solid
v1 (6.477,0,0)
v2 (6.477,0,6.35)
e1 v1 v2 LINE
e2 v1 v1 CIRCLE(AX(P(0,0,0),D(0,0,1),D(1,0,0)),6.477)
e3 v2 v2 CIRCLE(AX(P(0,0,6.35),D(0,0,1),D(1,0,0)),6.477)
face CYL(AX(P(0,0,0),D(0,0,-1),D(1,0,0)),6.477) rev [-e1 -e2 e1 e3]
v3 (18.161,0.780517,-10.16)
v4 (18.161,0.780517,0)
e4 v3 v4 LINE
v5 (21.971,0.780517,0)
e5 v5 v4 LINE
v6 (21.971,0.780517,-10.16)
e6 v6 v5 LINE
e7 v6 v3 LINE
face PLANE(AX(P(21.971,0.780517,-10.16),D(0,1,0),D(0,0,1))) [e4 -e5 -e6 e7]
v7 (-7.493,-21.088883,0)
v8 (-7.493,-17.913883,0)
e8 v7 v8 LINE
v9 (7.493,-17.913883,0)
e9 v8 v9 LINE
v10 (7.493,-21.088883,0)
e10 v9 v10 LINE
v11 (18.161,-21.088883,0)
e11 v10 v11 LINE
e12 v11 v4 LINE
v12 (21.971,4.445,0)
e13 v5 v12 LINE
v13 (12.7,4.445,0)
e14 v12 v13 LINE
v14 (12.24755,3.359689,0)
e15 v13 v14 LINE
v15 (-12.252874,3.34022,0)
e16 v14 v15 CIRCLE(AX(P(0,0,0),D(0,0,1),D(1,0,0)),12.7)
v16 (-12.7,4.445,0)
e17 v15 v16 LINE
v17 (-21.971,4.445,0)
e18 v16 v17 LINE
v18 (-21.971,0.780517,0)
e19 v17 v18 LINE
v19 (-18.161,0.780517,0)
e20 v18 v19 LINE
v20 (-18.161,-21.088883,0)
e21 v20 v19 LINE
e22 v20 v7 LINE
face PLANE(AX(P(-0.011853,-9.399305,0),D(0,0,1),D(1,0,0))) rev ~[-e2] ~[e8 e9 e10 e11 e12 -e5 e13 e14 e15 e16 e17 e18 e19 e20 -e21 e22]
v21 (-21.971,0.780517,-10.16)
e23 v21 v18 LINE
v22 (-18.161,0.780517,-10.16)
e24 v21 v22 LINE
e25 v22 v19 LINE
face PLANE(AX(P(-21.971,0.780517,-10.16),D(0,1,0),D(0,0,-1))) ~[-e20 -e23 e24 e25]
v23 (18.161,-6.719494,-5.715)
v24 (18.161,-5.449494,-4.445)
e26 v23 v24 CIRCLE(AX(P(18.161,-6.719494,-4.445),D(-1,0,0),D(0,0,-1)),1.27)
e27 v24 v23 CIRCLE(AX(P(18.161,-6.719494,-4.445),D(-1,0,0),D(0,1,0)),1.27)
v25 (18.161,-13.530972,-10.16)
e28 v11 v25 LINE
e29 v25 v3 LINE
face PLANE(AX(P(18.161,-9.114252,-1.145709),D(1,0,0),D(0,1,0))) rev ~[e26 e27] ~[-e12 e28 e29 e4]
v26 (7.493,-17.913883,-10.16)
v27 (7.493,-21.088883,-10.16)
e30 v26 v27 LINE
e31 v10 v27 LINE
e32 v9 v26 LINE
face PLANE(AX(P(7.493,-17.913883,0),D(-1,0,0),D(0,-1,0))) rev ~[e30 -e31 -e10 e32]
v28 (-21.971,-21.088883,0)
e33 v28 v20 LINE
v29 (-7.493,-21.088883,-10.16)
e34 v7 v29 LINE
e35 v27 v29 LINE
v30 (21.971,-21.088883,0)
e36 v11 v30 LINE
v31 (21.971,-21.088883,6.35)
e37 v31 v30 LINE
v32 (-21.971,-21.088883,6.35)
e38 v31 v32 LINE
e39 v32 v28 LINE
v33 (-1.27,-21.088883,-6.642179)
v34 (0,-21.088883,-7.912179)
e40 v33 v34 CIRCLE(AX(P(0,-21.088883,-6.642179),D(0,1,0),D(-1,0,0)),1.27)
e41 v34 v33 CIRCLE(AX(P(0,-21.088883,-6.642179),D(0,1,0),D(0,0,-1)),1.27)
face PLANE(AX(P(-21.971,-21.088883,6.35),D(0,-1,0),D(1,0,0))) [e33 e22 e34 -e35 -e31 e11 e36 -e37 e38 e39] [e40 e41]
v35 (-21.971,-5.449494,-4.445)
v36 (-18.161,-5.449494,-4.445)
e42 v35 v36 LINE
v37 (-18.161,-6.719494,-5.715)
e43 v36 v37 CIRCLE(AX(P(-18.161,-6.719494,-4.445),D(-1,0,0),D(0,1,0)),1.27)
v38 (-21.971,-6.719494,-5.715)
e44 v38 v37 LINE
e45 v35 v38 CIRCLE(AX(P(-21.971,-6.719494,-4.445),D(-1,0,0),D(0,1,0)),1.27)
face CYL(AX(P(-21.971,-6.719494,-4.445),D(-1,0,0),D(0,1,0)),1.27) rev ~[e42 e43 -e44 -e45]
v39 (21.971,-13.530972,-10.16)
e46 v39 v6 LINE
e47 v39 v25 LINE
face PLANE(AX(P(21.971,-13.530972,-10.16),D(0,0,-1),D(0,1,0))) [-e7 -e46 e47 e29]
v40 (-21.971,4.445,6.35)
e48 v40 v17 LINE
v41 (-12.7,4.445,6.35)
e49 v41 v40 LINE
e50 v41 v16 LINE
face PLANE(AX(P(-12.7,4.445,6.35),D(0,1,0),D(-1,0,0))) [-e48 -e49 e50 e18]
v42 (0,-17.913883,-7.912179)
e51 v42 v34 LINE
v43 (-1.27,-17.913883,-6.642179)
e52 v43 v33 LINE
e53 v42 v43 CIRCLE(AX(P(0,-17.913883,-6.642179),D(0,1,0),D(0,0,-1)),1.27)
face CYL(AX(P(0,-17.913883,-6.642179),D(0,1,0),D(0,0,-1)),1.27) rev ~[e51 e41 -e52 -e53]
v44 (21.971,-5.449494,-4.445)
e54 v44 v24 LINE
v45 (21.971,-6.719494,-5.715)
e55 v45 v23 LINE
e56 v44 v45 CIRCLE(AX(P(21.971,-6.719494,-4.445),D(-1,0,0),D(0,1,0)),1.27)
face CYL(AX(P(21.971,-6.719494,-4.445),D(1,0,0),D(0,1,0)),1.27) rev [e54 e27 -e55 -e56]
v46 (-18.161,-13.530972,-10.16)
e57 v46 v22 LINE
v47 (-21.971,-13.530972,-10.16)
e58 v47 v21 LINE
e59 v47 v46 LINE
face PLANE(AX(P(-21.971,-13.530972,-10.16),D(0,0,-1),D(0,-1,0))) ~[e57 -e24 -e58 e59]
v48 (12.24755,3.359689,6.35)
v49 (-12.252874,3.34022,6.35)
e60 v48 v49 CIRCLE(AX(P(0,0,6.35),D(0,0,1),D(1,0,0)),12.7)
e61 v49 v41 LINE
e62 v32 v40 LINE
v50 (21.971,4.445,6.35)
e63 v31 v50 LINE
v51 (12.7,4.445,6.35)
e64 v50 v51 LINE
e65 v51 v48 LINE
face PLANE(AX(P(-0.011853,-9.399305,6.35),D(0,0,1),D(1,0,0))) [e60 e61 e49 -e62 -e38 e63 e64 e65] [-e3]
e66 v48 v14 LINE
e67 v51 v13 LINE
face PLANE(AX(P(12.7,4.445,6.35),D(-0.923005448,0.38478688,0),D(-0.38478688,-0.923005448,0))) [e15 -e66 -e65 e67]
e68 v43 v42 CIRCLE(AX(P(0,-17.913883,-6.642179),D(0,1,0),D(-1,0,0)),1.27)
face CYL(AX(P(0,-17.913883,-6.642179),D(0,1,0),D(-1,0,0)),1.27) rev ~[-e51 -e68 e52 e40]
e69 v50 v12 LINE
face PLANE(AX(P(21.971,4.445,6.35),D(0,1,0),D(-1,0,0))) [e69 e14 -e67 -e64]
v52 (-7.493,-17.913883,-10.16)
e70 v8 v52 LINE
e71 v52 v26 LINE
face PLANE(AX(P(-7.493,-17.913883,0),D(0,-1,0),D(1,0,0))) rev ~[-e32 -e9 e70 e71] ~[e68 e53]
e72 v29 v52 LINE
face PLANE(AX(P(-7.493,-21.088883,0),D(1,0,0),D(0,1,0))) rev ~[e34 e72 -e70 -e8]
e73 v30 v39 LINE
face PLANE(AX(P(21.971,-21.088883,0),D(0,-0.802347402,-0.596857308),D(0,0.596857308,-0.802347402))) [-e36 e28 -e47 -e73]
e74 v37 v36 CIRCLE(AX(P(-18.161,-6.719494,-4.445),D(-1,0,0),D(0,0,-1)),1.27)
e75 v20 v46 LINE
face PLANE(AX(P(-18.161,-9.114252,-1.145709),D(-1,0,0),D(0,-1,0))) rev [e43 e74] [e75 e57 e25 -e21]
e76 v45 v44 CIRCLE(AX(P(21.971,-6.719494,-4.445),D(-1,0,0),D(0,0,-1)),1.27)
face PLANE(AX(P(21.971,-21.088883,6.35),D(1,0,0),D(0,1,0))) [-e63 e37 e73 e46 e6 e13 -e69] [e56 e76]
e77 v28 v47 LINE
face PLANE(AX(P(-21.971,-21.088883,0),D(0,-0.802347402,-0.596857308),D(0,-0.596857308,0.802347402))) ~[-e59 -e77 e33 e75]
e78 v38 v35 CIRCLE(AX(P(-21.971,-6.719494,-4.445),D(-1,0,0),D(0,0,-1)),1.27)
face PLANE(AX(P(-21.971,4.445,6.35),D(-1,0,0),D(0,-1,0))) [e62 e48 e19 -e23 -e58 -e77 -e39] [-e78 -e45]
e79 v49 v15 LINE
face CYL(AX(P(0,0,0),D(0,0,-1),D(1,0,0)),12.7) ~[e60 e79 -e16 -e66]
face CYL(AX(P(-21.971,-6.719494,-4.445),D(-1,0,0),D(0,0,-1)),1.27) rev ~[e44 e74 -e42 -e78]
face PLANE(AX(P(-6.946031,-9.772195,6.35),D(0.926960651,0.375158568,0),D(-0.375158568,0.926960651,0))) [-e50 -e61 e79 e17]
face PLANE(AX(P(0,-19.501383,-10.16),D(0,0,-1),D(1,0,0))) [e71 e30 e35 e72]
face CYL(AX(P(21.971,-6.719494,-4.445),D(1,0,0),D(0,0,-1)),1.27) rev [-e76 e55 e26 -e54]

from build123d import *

# Parameters (mm, degrees)
F0_R     = 12.7
F0_R_2   = 6.477
F1_DEPTH = 6.35
F3_DEPTH = 6.35
F5_DEPTH = 3.81
F7_DEPTH = 10.16
F9_DEPTH = 25.4


# Not quite as in the source:
# - a pattern or mirror of a feature is missing from the dataset's text; its kind, count and spacing are read off the source's solid


with BuildPart() as f1:
    # F0 (on Top) → F1 (new body)
    with BuildSketch(Plane.XY):
        Circle(F0_R)
        Circle(F0_R_2, mode=Mode.SUBTRACT)
    extrude(amount=F1_DEPTH)

    # F2 (on face) → F3 (join)
    with BuildSketch(Plane.XY.offset(6.35)):
        Polygon((-21.971, -21.0888834), (0, -21.0888834), (21.971, -21.0888834), (21.971, -17.9138834), (21.971, 4.445), (12.7, 4.445), (6.7730685696, -9.7721947122), (-6.9460314699, -9.7721947122), (-12.7, 4.445), (-21.971, 4.445), (-21.971, -17.907), align=None)
    extrude(amount=-F3_DEPTH)

    # F4 (on face) → F5 (join)
    with BuildSketch(Plane.YZ.offset(21.971)):
        Polygon((0.7805166, 6.35), (-21.0888834, 6.35), (-21.0888834, 0), (-13.5309724137, -10.16), (-6.7194938, -10.16), (0.7805166, -10.16), align=None)
        with BuildLine():
            ThreePointArc((-5.4494938, -4.445), (-5.8214681879, -5.3430256121), (-6.7194938, -5.715))
            ThreePointArc((-6.7194938, -5.715), (-7.6175194121, -3.5469743879), (-5.4494938, -4.445))
        make_face(mode=Mode.SUBTRACT)
    f5 = extrude(amount=-F5_DEPTH)

    # F5_copies: F5 across plane
    add(f5.mirror(Plane(origin=(0, 0, 0), x_dir=(0, 0, -1), z_dir=(-1, 0, 0))))

    # F6 (on face) → F7 (join)
    with BuildSketch(Plane(origin=(0, 0, 0), x_dir=(1, 0, 0), z_dir=(0, 0, -1))):
        Polygon((7.493, 21.0888834), (0, 21.0888834), (-7.493, 21.0888834), (-7.493, 17.9138834), (7.493, 17.9138834), align=None)
    extrude(amount=F7_DEPTH)

    # F8 (on face) → F9 (cut)
    with BuildSketch(Plane(origin=(0, -17.9138834, 0), x_dir=(-1, 0, 0), z_dir=(0, 1, 0))):
        with BuildLine():
            ThreePointArc((0, -7.912179098), (0.8980256121, -7.5402047101), (1.27, -6.642179098))
            ThreePointArc((1.27, -6.642179098), (-0.8980256121, -5.7441534859), (0, -7.912179098))
        make_face()
    extrude(amount=-F9_DEPTH, mode=Mode.SUBTRACT)


solid = f1.part
